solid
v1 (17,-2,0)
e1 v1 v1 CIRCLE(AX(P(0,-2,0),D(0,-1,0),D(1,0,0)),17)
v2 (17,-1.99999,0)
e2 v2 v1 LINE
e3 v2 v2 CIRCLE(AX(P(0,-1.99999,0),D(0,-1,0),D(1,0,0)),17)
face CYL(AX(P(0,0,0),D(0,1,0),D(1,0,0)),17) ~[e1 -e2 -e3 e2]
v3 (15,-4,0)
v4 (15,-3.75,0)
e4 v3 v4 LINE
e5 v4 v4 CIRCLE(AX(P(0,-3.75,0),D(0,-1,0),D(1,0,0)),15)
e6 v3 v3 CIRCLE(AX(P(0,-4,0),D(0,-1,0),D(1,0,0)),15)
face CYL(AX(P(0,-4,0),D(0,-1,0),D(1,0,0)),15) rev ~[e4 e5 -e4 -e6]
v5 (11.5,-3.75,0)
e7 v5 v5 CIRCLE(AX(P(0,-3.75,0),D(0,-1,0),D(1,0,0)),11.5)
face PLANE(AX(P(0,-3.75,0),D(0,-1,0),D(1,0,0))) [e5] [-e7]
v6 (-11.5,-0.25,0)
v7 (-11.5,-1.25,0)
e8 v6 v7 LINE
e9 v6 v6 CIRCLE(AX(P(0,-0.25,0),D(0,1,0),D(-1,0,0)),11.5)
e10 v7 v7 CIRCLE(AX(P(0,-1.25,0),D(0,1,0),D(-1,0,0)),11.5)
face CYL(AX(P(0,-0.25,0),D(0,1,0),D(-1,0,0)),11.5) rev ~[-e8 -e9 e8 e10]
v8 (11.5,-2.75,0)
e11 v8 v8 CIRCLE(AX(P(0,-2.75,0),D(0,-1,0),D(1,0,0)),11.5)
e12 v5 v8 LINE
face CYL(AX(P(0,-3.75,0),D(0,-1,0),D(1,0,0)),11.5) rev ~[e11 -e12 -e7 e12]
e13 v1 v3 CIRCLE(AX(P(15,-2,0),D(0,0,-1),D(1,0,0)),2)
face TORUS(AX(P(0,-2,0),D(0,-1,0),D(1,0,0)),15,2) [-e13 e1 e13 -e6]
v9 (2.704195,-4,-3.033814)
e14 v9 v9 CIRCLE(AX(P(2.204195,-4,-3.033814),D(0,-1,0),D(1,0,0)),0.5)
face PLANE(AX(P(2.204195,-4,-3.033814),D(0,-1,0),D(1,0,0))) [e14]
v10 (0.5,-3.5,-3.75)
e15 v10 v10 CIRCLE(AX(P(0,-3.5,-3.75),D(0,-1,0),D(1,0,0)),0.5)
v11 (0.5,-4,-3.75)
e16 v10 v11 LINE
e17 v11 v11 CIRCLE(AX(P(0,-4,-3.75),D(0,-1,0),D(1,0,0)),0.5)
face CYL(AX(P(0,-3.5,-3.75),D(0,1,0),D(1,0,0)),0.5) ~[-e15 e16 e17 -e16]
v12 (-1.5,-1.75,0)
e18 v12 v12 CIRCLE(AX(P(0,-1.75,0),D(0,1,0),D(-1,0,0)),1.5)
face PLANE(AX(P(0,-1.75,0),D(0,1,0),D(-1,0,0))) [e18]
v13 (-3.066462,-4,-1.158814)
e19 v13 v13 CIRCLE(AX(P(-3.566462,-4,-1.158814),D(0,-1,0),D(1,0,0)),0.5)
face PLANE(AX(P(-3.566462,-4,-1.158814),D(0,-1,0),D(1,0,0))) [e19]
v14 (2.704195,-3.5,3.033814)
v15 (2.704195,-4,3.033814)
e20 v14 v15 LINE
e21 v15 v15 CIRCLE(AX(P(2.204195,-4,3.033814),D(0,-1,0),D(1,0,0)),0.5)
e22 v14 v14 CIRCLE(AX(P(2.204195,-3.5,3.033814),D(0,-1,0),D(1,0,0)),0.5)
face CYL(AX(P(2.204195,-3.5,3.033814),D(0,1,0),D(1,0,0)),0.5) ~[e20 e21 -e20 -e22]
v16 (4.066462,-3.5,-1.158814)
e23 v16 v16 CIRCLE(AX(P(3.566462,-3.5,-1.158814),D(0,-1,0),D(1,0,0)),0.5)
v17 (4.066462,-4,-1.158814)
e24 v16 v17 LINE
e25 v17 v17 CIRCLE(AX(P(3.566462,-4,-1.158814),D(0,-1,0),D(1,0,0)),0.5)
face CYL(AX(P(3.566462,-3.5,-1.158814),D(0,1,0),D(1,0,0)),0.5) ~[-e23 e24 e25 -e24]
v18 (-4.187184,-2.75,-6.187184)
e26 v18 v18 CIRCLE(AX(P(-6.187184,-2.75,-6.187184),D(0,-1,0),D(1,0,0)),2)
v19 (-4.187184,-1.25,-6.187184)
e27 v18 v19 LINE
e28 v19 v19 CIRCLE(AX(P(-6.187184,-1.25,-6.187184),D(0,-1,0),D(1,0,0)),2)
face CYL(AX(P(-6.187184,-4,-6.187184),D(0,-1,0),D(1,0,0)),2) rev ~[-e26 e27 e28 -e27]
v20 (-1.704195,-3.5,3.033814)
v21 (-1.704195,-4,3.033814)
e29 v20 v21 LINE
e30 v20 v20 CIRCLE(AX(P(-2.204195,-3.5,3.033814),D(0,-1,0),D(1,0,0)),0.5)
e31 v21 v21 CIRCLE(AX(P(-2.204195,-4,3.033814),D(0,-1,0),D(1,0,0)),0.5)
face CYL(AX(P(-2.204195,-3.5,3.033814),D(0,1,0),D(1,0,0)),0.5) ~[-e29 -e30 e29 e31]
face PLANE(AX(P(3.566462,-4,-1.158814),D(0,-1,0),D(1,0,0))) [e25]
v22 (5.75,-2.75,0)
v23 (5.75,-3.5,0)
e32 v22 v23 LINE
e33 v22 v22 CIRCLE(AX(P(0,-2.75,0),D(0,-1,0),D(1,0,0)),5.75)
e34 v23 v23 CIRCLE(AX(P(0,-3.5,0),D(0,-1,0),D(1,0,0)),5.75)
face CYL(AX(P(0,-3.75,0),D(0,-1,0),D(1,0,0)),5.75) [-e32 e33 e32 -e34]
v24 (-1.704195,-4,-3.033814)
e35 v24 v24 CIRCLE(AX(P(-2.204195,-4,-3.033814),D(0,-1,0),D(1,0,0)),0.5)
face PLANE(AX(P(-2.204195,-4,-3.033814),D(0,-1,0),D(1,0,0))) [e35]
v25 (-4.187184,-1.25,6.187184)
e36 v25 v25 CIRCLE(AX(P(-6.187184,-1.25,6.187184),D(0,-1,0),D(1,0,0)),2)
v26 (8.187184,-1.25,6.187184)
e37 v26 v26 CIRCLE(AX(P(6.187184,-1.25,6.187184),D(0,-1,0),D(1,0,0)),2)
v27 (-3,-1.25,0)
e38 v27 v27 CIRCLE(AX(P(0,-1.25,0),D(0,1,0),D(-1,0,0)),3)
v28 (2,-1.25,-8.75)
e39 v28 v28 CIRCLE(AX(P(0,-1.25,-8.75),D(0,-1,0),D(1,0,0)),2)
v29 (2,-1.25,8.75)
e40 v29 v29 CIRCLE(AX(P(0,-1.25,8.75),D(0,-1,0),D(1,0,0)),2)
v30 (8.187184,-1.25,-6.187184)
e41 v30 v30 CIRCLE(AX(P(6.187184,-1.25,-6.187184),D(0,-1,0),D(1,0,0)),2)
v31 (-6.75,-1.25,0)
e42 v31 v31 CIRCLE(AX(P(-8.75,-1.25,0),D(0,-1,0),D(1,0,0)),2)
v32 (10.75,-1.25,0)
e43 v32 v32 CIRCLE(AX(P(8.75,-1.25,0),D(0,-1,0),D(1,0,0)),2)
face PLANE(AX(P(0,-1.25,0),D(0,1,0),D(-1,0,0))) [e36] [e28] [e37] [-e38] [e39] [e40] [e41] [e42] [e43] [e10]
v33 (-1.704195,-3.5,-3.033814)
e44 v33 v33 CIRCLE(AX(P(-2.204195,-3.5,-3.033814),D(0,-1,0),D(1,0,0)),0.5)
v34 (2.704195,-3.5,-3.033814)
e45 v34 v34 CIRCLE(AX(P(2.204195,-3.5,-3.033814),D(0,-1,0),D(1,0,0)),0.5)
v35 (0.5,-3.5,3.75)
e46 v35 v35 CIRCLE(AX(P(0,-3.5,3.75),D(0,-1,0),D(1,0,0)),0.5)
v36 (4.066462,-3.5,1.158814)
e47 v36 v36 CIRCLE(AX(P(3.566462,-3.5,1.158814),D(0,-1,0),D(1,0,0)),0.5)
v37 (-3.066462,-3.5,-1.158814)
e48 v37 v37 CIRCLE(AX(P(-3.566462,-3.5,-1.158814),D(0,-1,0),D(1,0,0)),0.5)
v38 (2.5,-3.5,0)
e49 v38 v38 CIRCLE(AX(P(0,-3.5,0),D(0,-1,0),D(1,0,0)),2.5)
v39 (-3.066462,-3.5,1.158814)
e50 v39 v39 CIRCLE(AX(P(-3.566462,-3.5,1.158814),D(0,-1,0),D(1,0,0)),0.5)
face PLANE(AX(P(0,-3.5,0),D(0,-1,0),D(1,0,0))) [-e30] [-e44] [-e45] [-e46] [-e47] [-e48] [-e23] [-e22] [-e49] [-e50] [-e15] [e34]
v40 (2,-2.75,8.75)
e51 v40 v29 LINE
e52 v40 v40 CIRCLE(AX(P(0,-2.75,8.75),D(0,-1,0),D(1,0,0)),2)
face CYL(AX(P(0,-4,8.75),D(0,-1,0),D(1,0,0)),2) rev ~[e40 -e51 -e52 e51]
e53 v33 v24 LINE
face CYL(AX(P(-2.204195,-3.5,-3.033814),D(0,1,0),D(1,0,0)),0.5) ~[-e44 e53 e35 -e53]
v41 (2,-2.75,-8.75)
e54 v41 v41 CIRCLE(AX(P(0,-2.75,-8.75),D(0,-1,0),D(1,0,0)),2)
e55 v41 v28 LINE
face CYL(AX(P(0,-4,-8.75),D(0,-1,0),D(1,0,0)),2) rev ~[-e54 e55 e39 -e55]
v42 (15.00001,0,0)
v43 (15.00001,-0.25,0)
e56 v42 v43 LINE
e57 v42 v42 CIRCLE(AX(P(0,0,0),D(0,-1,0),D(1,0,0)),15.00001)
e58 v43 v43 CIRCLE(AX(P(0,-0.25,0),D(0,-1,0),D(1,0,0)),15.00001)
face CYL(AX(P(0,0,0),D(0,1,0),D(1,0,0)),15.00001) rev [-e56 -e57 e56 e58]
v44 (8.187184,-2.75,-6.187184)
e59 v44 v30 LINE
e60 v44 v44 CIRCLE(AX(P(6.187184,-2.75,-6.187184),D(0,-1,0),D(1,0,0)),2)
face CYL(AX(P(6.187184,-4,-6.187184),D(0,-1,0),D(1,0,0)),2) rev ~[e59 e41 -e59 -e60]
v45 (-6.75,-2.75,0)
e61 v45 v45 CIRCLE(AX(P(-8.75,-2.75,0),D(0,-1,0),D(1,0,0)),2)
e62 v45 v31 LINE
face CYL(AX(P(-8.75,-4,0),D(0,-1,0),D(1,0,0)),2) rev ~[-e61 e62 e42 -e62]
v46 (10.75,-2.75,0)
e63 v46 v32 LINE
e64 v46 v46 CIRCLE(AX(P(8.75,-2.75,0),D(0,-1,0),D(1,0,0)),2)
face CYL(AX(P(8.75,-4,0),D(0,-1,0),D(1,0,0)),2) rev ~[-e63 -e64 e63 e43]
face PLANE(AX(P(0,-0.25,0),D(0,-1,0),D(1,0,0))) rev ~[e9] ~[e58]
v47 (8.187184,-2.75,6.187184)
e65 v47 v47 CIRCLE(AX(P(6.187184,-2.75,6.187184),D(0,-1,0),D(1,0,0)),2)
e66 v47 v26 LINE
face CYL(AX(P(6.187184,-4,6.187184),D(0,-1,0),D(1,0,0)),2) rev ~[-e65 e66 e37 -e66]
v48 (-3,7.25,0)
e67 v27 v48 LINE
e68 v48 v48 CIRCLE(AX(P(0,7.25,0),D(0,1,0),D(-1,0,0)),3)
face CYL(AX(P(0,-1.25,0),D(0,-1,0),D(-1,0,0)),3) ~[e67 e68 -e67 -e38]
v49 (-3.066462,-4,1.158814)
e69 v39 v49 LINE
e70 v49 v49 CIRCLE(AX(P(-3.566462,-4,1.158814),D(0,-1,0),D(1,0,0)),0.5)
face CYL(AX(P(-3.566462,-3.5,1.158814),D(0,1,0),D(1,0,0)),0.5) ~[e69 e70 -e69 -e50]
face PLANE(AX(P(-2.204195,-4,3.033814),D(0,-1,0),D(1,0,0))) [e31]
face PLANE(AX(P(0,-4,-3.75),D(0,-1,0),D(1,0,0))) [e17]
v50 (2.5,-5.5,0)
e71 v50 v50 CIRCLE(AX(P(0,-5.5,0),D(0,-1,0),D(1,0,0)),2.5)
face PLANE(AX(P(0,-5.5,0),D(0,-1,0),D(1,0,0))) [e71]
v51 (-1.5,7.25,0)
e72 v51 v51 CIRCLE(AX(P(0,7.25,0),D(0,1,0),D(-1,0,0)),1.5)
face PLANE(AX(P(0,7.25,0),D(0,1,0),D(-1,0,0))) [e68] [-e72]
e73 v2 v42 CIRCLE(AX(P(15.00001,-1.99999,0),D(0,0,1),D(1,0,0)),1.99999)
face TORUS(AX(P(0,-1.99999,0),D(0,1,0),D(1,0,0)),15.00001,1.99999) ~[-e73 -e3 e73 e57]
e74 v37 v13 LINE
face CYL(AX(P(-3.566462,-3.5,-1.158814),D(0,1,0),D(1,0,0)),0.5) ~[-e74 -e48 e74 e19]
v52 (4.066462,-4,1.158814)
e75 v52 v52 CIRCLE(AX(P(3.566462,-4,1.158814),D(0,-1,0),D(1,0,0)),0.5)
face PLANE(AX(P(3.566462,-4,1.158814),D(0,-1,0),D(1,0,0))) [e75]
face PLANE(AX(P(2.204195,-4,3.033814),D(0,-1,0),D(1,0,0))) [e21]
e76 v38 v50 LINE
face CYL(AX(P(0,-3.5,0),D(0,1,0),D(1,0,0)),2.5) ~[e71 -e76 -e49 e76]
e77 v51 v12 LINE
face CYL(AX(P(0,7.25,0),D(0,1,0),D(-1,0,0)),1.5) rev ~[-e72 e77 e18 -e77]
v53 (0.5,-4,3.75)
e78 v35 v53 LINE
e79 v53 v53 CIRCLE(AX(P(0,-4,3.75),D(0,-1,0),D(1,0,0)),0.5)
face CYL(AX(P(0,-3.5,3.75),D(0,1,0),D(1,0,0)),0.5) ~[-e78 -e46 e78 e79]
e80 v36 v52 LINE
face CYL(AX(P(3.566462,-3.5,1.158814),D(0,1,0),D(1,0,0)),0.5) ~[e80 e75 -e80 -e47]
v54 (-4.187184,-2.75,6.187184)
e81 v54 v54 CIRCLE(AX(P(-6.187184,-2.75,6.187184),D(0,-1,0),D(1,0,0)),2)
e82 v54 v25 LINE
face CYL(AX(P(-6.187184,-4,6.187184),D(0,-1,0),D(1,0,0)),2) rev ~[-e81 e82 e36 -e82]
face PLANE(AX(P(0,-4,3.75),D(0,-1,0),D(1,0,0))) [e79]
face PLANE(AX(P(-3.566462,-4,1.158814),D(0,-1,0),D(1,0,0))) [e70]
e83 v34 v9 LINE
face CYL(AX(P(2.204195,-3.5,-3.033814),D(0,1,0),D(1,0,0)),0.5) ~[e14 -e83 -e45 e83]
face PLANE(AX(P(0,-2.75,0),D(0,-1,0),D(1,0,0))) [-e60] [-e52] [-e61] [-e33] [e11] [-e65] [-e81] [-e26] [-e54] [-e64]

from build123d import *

# Parameters (mm, degrees)
F0_R      = 17
F1_DEPTH  = 4
F2_R      = 2
F3_R      = 1.99999
F4_R      = 15
F4_R_2    = 2
F4_R_3    = 5.75
F5_DEPTH  = 0.25
F6_DEPTH  = 0.25
F7_R      = 11.5
F7_R_2    = 2
F7_R_3    = 5.75
F8_DEPTH  = 1
F9_R      = 11.5
F10_DEPTH = 1
F11_DEPTH = 5
F12_DEPTH = 0.5
F13_R     = 0.5
F14_DEPTH = 0.5
F13_R_2   = 2.5
F15_DEPTH = 2
F16_R     = 3
F17_DEPTH = 8.5
F18_R     = 1.5
F19_DEPTH = 9


# Not quite as in the source:
# - a fillet or chamfer is up to 0.001 mm smaller than in the source, because OpenCascade refuses the exact size


with BuildPart() as f1:
    # F0 (on Front) → F1 (new body)
    with BuildSketch(Plane.XZ):
        Circle(F0_R)
    extrude(amount=F1_DEPTH)

    # F2
    f2_edges = [f1.edges().sort_by_distance(p)[0] for p in [
        (-17, -4, 0),
    ]]
    fillet(f2_edges, radius=F2_R)

    # F3 (radius 2 in the source; OpenCascade refuses exactly that, so slightly less here)
    f3_edges = [f1.edges().sort_by_distance(p)[0] for p in [
        (-17, 0, 0),
    ]]
    fillet(f3_edges, radius=F3_R)

    # F4 (on face) → F5 (cut)
    with BuildSketch(Plane.XZ.offset(4)):
        Circle(F4_R)
        with Locations((-6.1871843354, -6.1871843354)):
            Circle(F4_R_2, mode=Mode.SUBTRACT)
        with Locations((0, -8.75)):
            Circle(F4_R_2, mode=Mode.SUBTRACT)
        with Locations((6.1871843354, -6.1871843354)):
            Circle(F4_R_2, mode=Mode.SUBTRACT)
        with Locations((-8.75, 0)):
            Circle(F4_R_2, mode=Mode.SUBTRACT)
        with Locations((-6.1871843354, 6.1871843354)):
            Circle(F4_R_2, mode=Mode.SUBTRACT)
        Circle(F4_R_3, mode=Mode.SUBTRACT)
        with Locations((6.1871843354, 6.1871843354)):
            Circle(F4_R_2, mode=Mode.SUBTRACT)
        with Locations((8.75, 0)):
            Circle(F4_R_2, mode=Mode.SUBTRACT)
        with Locations((0, 8.75)):
            Circle(F4_R_2, mode=Mode.SUBTRACT)
    extrude(amount=-F5_DEPTH, mode=Mode.SUBTRACT)

    # F6 (cut): a face of the model
    f6_faces = [f1.faces().sort_by_distance(p)[0] for p in [
        (0, 0, 0),
    ]]
    extrude(f6_faces, amount=-F6_DEPTH, mode=Mode.SUBTRACT)

    # F7 (on face) → F8 (cut)
    with BuildSketch(Plane.XZ.offset(3.75)):
        Circle(F7_R)
        with Locations((-6.1871843354, -6.1871843354)):
            Circle(F7_R_2, mode=Mode.SUBTRACT)
        with Locations((0, -8.75)):
            Circle(F7_R_2, mode=Mode.SUBTRACT)
        with Locations((6.1871843354, -6.1871843354)):
            Circle(F7_R_2, mode=Mode.SUBTRACT)
        with Locations((-8.75, 0)):
            Circle(F7_R_2, mode=Mode.SUBTRACT)
        with Locations((-6.1871843354, 6.1871843354)):
            Circle(F7_R_2, mode=Mode.SUBTRACT)
        Circle(F7_R_3, mode=Mode.SUBTRACT)
        with Locations((6.1871843354, 6.1871843354)):
            Circle(F7_R_2, mode=Mode.SUBTRACT)
        with Locations((8.75, 0)):
            Circle(F7_R_2, mode=Mode.SUBTRACT)
        with Locations((0, 8.75)):
            Circle(F7_R_2, mode=Mode.SUBTRACT)
    extrude(amount=-F8_DEPTH, mode=Mode.SUBTRACT)

    # F9 (on face) → F10 (cut)
    with BuildSketch(Plane(origin=(0, -0.25, 0), x_dir=(-1, 0, 0), z_dir=(0, 1, 0))):
        Circle(F9_R)
    extrude(amount=-F10_DEPTH, mode=Mode.SUBTRACT)

    # F11 (cut): faces of the model
    f11_faces = [f1.faces().sort_by_distance(p)[0] for p in [
        (-6.1871843354, -4, 6.1871843354),
        (0, -4, 8.75),
        (6.1871843354, -4, 6.1871843354),
        (8.75, -4, 0),
        (6.1871843354, -4, -6.1871843354),
        (0, -4, -8.75),
        (-6.1871843354, -4, -6.1871843354),
        (-8.75, -4, 0),
    ]]
    extrude(f11_faces, amount=-F11_DEPTH, mode=Mode.SUBTRACT)

    # F12 (cut): a face of the model
    f12_faces = [f1.faces().sort_by_distance(p)[0] for p in [
        (0, -4, 0),
    ]]
    extrude(f12_faces, amount=-F12_DEPTH, mode=Mode.SUBTRACT)

    # F13 (on face) → F14 (join)
    with BuildSketch(Plane.XZ.offset(3.5)):
        with Locations((0, 3.75)):
            Circle(F13_R)
        with Locations((2.2041946961, 3.0338137289)):
            Circle(F13_R)
        with Locations((3.5664619361, 1.1588137289)):
            Circle(F13_R)
        with Locations((3.5664619361, -1.1588137289)):
            Circle(F13_R)
        with Locations((2.2041946961, -3.0338137289)):
            Circle(F13_R)
        with Locations((0, -3.75)):
            Circle(F13_R)
        with Locations((-2.2041946961, -3.0338137289)):
            Circle(F13_R)
        with Locations((-3.5664619361, -1.1588137289)):
            Circle(F13_R)
        with Locations((-3.5664619361, 1.1588137289)):
            Circle(F13_R)
        with Locations((-2.2041946961, 3.0338137289)):
            Circle(F13_R)
    extrude(amount=F14_DEPTH)

    # F13 (on face) → F15 (join)
    with BuildSketch(Plane.XZ.offset(3.5)):
        Circle(F13_R_2)
    extrude(amount=F15_DEPTH)

    # F16 (on face) → F17 (join)
    with BuildSketch(Plane(origin=(0, -1.25, 0), x_dir=(-1, 0, 0), z_dir=(0, 1, 0))):
        Circle(F16_R)
    extrude(amount=F17_DEPTH)

    # F18 (on face) → F19 (cut)
    with BuildSketch(Plane(origin=(0, 7.25, 0), x_dir=(-1, 0, 0), z_dir=(0, 1, 0))):
        Circle(F18_R)
    extrude(amount=-F19_DEPTH, mode=Mode.SUBTRACT)


solid = f1.part
